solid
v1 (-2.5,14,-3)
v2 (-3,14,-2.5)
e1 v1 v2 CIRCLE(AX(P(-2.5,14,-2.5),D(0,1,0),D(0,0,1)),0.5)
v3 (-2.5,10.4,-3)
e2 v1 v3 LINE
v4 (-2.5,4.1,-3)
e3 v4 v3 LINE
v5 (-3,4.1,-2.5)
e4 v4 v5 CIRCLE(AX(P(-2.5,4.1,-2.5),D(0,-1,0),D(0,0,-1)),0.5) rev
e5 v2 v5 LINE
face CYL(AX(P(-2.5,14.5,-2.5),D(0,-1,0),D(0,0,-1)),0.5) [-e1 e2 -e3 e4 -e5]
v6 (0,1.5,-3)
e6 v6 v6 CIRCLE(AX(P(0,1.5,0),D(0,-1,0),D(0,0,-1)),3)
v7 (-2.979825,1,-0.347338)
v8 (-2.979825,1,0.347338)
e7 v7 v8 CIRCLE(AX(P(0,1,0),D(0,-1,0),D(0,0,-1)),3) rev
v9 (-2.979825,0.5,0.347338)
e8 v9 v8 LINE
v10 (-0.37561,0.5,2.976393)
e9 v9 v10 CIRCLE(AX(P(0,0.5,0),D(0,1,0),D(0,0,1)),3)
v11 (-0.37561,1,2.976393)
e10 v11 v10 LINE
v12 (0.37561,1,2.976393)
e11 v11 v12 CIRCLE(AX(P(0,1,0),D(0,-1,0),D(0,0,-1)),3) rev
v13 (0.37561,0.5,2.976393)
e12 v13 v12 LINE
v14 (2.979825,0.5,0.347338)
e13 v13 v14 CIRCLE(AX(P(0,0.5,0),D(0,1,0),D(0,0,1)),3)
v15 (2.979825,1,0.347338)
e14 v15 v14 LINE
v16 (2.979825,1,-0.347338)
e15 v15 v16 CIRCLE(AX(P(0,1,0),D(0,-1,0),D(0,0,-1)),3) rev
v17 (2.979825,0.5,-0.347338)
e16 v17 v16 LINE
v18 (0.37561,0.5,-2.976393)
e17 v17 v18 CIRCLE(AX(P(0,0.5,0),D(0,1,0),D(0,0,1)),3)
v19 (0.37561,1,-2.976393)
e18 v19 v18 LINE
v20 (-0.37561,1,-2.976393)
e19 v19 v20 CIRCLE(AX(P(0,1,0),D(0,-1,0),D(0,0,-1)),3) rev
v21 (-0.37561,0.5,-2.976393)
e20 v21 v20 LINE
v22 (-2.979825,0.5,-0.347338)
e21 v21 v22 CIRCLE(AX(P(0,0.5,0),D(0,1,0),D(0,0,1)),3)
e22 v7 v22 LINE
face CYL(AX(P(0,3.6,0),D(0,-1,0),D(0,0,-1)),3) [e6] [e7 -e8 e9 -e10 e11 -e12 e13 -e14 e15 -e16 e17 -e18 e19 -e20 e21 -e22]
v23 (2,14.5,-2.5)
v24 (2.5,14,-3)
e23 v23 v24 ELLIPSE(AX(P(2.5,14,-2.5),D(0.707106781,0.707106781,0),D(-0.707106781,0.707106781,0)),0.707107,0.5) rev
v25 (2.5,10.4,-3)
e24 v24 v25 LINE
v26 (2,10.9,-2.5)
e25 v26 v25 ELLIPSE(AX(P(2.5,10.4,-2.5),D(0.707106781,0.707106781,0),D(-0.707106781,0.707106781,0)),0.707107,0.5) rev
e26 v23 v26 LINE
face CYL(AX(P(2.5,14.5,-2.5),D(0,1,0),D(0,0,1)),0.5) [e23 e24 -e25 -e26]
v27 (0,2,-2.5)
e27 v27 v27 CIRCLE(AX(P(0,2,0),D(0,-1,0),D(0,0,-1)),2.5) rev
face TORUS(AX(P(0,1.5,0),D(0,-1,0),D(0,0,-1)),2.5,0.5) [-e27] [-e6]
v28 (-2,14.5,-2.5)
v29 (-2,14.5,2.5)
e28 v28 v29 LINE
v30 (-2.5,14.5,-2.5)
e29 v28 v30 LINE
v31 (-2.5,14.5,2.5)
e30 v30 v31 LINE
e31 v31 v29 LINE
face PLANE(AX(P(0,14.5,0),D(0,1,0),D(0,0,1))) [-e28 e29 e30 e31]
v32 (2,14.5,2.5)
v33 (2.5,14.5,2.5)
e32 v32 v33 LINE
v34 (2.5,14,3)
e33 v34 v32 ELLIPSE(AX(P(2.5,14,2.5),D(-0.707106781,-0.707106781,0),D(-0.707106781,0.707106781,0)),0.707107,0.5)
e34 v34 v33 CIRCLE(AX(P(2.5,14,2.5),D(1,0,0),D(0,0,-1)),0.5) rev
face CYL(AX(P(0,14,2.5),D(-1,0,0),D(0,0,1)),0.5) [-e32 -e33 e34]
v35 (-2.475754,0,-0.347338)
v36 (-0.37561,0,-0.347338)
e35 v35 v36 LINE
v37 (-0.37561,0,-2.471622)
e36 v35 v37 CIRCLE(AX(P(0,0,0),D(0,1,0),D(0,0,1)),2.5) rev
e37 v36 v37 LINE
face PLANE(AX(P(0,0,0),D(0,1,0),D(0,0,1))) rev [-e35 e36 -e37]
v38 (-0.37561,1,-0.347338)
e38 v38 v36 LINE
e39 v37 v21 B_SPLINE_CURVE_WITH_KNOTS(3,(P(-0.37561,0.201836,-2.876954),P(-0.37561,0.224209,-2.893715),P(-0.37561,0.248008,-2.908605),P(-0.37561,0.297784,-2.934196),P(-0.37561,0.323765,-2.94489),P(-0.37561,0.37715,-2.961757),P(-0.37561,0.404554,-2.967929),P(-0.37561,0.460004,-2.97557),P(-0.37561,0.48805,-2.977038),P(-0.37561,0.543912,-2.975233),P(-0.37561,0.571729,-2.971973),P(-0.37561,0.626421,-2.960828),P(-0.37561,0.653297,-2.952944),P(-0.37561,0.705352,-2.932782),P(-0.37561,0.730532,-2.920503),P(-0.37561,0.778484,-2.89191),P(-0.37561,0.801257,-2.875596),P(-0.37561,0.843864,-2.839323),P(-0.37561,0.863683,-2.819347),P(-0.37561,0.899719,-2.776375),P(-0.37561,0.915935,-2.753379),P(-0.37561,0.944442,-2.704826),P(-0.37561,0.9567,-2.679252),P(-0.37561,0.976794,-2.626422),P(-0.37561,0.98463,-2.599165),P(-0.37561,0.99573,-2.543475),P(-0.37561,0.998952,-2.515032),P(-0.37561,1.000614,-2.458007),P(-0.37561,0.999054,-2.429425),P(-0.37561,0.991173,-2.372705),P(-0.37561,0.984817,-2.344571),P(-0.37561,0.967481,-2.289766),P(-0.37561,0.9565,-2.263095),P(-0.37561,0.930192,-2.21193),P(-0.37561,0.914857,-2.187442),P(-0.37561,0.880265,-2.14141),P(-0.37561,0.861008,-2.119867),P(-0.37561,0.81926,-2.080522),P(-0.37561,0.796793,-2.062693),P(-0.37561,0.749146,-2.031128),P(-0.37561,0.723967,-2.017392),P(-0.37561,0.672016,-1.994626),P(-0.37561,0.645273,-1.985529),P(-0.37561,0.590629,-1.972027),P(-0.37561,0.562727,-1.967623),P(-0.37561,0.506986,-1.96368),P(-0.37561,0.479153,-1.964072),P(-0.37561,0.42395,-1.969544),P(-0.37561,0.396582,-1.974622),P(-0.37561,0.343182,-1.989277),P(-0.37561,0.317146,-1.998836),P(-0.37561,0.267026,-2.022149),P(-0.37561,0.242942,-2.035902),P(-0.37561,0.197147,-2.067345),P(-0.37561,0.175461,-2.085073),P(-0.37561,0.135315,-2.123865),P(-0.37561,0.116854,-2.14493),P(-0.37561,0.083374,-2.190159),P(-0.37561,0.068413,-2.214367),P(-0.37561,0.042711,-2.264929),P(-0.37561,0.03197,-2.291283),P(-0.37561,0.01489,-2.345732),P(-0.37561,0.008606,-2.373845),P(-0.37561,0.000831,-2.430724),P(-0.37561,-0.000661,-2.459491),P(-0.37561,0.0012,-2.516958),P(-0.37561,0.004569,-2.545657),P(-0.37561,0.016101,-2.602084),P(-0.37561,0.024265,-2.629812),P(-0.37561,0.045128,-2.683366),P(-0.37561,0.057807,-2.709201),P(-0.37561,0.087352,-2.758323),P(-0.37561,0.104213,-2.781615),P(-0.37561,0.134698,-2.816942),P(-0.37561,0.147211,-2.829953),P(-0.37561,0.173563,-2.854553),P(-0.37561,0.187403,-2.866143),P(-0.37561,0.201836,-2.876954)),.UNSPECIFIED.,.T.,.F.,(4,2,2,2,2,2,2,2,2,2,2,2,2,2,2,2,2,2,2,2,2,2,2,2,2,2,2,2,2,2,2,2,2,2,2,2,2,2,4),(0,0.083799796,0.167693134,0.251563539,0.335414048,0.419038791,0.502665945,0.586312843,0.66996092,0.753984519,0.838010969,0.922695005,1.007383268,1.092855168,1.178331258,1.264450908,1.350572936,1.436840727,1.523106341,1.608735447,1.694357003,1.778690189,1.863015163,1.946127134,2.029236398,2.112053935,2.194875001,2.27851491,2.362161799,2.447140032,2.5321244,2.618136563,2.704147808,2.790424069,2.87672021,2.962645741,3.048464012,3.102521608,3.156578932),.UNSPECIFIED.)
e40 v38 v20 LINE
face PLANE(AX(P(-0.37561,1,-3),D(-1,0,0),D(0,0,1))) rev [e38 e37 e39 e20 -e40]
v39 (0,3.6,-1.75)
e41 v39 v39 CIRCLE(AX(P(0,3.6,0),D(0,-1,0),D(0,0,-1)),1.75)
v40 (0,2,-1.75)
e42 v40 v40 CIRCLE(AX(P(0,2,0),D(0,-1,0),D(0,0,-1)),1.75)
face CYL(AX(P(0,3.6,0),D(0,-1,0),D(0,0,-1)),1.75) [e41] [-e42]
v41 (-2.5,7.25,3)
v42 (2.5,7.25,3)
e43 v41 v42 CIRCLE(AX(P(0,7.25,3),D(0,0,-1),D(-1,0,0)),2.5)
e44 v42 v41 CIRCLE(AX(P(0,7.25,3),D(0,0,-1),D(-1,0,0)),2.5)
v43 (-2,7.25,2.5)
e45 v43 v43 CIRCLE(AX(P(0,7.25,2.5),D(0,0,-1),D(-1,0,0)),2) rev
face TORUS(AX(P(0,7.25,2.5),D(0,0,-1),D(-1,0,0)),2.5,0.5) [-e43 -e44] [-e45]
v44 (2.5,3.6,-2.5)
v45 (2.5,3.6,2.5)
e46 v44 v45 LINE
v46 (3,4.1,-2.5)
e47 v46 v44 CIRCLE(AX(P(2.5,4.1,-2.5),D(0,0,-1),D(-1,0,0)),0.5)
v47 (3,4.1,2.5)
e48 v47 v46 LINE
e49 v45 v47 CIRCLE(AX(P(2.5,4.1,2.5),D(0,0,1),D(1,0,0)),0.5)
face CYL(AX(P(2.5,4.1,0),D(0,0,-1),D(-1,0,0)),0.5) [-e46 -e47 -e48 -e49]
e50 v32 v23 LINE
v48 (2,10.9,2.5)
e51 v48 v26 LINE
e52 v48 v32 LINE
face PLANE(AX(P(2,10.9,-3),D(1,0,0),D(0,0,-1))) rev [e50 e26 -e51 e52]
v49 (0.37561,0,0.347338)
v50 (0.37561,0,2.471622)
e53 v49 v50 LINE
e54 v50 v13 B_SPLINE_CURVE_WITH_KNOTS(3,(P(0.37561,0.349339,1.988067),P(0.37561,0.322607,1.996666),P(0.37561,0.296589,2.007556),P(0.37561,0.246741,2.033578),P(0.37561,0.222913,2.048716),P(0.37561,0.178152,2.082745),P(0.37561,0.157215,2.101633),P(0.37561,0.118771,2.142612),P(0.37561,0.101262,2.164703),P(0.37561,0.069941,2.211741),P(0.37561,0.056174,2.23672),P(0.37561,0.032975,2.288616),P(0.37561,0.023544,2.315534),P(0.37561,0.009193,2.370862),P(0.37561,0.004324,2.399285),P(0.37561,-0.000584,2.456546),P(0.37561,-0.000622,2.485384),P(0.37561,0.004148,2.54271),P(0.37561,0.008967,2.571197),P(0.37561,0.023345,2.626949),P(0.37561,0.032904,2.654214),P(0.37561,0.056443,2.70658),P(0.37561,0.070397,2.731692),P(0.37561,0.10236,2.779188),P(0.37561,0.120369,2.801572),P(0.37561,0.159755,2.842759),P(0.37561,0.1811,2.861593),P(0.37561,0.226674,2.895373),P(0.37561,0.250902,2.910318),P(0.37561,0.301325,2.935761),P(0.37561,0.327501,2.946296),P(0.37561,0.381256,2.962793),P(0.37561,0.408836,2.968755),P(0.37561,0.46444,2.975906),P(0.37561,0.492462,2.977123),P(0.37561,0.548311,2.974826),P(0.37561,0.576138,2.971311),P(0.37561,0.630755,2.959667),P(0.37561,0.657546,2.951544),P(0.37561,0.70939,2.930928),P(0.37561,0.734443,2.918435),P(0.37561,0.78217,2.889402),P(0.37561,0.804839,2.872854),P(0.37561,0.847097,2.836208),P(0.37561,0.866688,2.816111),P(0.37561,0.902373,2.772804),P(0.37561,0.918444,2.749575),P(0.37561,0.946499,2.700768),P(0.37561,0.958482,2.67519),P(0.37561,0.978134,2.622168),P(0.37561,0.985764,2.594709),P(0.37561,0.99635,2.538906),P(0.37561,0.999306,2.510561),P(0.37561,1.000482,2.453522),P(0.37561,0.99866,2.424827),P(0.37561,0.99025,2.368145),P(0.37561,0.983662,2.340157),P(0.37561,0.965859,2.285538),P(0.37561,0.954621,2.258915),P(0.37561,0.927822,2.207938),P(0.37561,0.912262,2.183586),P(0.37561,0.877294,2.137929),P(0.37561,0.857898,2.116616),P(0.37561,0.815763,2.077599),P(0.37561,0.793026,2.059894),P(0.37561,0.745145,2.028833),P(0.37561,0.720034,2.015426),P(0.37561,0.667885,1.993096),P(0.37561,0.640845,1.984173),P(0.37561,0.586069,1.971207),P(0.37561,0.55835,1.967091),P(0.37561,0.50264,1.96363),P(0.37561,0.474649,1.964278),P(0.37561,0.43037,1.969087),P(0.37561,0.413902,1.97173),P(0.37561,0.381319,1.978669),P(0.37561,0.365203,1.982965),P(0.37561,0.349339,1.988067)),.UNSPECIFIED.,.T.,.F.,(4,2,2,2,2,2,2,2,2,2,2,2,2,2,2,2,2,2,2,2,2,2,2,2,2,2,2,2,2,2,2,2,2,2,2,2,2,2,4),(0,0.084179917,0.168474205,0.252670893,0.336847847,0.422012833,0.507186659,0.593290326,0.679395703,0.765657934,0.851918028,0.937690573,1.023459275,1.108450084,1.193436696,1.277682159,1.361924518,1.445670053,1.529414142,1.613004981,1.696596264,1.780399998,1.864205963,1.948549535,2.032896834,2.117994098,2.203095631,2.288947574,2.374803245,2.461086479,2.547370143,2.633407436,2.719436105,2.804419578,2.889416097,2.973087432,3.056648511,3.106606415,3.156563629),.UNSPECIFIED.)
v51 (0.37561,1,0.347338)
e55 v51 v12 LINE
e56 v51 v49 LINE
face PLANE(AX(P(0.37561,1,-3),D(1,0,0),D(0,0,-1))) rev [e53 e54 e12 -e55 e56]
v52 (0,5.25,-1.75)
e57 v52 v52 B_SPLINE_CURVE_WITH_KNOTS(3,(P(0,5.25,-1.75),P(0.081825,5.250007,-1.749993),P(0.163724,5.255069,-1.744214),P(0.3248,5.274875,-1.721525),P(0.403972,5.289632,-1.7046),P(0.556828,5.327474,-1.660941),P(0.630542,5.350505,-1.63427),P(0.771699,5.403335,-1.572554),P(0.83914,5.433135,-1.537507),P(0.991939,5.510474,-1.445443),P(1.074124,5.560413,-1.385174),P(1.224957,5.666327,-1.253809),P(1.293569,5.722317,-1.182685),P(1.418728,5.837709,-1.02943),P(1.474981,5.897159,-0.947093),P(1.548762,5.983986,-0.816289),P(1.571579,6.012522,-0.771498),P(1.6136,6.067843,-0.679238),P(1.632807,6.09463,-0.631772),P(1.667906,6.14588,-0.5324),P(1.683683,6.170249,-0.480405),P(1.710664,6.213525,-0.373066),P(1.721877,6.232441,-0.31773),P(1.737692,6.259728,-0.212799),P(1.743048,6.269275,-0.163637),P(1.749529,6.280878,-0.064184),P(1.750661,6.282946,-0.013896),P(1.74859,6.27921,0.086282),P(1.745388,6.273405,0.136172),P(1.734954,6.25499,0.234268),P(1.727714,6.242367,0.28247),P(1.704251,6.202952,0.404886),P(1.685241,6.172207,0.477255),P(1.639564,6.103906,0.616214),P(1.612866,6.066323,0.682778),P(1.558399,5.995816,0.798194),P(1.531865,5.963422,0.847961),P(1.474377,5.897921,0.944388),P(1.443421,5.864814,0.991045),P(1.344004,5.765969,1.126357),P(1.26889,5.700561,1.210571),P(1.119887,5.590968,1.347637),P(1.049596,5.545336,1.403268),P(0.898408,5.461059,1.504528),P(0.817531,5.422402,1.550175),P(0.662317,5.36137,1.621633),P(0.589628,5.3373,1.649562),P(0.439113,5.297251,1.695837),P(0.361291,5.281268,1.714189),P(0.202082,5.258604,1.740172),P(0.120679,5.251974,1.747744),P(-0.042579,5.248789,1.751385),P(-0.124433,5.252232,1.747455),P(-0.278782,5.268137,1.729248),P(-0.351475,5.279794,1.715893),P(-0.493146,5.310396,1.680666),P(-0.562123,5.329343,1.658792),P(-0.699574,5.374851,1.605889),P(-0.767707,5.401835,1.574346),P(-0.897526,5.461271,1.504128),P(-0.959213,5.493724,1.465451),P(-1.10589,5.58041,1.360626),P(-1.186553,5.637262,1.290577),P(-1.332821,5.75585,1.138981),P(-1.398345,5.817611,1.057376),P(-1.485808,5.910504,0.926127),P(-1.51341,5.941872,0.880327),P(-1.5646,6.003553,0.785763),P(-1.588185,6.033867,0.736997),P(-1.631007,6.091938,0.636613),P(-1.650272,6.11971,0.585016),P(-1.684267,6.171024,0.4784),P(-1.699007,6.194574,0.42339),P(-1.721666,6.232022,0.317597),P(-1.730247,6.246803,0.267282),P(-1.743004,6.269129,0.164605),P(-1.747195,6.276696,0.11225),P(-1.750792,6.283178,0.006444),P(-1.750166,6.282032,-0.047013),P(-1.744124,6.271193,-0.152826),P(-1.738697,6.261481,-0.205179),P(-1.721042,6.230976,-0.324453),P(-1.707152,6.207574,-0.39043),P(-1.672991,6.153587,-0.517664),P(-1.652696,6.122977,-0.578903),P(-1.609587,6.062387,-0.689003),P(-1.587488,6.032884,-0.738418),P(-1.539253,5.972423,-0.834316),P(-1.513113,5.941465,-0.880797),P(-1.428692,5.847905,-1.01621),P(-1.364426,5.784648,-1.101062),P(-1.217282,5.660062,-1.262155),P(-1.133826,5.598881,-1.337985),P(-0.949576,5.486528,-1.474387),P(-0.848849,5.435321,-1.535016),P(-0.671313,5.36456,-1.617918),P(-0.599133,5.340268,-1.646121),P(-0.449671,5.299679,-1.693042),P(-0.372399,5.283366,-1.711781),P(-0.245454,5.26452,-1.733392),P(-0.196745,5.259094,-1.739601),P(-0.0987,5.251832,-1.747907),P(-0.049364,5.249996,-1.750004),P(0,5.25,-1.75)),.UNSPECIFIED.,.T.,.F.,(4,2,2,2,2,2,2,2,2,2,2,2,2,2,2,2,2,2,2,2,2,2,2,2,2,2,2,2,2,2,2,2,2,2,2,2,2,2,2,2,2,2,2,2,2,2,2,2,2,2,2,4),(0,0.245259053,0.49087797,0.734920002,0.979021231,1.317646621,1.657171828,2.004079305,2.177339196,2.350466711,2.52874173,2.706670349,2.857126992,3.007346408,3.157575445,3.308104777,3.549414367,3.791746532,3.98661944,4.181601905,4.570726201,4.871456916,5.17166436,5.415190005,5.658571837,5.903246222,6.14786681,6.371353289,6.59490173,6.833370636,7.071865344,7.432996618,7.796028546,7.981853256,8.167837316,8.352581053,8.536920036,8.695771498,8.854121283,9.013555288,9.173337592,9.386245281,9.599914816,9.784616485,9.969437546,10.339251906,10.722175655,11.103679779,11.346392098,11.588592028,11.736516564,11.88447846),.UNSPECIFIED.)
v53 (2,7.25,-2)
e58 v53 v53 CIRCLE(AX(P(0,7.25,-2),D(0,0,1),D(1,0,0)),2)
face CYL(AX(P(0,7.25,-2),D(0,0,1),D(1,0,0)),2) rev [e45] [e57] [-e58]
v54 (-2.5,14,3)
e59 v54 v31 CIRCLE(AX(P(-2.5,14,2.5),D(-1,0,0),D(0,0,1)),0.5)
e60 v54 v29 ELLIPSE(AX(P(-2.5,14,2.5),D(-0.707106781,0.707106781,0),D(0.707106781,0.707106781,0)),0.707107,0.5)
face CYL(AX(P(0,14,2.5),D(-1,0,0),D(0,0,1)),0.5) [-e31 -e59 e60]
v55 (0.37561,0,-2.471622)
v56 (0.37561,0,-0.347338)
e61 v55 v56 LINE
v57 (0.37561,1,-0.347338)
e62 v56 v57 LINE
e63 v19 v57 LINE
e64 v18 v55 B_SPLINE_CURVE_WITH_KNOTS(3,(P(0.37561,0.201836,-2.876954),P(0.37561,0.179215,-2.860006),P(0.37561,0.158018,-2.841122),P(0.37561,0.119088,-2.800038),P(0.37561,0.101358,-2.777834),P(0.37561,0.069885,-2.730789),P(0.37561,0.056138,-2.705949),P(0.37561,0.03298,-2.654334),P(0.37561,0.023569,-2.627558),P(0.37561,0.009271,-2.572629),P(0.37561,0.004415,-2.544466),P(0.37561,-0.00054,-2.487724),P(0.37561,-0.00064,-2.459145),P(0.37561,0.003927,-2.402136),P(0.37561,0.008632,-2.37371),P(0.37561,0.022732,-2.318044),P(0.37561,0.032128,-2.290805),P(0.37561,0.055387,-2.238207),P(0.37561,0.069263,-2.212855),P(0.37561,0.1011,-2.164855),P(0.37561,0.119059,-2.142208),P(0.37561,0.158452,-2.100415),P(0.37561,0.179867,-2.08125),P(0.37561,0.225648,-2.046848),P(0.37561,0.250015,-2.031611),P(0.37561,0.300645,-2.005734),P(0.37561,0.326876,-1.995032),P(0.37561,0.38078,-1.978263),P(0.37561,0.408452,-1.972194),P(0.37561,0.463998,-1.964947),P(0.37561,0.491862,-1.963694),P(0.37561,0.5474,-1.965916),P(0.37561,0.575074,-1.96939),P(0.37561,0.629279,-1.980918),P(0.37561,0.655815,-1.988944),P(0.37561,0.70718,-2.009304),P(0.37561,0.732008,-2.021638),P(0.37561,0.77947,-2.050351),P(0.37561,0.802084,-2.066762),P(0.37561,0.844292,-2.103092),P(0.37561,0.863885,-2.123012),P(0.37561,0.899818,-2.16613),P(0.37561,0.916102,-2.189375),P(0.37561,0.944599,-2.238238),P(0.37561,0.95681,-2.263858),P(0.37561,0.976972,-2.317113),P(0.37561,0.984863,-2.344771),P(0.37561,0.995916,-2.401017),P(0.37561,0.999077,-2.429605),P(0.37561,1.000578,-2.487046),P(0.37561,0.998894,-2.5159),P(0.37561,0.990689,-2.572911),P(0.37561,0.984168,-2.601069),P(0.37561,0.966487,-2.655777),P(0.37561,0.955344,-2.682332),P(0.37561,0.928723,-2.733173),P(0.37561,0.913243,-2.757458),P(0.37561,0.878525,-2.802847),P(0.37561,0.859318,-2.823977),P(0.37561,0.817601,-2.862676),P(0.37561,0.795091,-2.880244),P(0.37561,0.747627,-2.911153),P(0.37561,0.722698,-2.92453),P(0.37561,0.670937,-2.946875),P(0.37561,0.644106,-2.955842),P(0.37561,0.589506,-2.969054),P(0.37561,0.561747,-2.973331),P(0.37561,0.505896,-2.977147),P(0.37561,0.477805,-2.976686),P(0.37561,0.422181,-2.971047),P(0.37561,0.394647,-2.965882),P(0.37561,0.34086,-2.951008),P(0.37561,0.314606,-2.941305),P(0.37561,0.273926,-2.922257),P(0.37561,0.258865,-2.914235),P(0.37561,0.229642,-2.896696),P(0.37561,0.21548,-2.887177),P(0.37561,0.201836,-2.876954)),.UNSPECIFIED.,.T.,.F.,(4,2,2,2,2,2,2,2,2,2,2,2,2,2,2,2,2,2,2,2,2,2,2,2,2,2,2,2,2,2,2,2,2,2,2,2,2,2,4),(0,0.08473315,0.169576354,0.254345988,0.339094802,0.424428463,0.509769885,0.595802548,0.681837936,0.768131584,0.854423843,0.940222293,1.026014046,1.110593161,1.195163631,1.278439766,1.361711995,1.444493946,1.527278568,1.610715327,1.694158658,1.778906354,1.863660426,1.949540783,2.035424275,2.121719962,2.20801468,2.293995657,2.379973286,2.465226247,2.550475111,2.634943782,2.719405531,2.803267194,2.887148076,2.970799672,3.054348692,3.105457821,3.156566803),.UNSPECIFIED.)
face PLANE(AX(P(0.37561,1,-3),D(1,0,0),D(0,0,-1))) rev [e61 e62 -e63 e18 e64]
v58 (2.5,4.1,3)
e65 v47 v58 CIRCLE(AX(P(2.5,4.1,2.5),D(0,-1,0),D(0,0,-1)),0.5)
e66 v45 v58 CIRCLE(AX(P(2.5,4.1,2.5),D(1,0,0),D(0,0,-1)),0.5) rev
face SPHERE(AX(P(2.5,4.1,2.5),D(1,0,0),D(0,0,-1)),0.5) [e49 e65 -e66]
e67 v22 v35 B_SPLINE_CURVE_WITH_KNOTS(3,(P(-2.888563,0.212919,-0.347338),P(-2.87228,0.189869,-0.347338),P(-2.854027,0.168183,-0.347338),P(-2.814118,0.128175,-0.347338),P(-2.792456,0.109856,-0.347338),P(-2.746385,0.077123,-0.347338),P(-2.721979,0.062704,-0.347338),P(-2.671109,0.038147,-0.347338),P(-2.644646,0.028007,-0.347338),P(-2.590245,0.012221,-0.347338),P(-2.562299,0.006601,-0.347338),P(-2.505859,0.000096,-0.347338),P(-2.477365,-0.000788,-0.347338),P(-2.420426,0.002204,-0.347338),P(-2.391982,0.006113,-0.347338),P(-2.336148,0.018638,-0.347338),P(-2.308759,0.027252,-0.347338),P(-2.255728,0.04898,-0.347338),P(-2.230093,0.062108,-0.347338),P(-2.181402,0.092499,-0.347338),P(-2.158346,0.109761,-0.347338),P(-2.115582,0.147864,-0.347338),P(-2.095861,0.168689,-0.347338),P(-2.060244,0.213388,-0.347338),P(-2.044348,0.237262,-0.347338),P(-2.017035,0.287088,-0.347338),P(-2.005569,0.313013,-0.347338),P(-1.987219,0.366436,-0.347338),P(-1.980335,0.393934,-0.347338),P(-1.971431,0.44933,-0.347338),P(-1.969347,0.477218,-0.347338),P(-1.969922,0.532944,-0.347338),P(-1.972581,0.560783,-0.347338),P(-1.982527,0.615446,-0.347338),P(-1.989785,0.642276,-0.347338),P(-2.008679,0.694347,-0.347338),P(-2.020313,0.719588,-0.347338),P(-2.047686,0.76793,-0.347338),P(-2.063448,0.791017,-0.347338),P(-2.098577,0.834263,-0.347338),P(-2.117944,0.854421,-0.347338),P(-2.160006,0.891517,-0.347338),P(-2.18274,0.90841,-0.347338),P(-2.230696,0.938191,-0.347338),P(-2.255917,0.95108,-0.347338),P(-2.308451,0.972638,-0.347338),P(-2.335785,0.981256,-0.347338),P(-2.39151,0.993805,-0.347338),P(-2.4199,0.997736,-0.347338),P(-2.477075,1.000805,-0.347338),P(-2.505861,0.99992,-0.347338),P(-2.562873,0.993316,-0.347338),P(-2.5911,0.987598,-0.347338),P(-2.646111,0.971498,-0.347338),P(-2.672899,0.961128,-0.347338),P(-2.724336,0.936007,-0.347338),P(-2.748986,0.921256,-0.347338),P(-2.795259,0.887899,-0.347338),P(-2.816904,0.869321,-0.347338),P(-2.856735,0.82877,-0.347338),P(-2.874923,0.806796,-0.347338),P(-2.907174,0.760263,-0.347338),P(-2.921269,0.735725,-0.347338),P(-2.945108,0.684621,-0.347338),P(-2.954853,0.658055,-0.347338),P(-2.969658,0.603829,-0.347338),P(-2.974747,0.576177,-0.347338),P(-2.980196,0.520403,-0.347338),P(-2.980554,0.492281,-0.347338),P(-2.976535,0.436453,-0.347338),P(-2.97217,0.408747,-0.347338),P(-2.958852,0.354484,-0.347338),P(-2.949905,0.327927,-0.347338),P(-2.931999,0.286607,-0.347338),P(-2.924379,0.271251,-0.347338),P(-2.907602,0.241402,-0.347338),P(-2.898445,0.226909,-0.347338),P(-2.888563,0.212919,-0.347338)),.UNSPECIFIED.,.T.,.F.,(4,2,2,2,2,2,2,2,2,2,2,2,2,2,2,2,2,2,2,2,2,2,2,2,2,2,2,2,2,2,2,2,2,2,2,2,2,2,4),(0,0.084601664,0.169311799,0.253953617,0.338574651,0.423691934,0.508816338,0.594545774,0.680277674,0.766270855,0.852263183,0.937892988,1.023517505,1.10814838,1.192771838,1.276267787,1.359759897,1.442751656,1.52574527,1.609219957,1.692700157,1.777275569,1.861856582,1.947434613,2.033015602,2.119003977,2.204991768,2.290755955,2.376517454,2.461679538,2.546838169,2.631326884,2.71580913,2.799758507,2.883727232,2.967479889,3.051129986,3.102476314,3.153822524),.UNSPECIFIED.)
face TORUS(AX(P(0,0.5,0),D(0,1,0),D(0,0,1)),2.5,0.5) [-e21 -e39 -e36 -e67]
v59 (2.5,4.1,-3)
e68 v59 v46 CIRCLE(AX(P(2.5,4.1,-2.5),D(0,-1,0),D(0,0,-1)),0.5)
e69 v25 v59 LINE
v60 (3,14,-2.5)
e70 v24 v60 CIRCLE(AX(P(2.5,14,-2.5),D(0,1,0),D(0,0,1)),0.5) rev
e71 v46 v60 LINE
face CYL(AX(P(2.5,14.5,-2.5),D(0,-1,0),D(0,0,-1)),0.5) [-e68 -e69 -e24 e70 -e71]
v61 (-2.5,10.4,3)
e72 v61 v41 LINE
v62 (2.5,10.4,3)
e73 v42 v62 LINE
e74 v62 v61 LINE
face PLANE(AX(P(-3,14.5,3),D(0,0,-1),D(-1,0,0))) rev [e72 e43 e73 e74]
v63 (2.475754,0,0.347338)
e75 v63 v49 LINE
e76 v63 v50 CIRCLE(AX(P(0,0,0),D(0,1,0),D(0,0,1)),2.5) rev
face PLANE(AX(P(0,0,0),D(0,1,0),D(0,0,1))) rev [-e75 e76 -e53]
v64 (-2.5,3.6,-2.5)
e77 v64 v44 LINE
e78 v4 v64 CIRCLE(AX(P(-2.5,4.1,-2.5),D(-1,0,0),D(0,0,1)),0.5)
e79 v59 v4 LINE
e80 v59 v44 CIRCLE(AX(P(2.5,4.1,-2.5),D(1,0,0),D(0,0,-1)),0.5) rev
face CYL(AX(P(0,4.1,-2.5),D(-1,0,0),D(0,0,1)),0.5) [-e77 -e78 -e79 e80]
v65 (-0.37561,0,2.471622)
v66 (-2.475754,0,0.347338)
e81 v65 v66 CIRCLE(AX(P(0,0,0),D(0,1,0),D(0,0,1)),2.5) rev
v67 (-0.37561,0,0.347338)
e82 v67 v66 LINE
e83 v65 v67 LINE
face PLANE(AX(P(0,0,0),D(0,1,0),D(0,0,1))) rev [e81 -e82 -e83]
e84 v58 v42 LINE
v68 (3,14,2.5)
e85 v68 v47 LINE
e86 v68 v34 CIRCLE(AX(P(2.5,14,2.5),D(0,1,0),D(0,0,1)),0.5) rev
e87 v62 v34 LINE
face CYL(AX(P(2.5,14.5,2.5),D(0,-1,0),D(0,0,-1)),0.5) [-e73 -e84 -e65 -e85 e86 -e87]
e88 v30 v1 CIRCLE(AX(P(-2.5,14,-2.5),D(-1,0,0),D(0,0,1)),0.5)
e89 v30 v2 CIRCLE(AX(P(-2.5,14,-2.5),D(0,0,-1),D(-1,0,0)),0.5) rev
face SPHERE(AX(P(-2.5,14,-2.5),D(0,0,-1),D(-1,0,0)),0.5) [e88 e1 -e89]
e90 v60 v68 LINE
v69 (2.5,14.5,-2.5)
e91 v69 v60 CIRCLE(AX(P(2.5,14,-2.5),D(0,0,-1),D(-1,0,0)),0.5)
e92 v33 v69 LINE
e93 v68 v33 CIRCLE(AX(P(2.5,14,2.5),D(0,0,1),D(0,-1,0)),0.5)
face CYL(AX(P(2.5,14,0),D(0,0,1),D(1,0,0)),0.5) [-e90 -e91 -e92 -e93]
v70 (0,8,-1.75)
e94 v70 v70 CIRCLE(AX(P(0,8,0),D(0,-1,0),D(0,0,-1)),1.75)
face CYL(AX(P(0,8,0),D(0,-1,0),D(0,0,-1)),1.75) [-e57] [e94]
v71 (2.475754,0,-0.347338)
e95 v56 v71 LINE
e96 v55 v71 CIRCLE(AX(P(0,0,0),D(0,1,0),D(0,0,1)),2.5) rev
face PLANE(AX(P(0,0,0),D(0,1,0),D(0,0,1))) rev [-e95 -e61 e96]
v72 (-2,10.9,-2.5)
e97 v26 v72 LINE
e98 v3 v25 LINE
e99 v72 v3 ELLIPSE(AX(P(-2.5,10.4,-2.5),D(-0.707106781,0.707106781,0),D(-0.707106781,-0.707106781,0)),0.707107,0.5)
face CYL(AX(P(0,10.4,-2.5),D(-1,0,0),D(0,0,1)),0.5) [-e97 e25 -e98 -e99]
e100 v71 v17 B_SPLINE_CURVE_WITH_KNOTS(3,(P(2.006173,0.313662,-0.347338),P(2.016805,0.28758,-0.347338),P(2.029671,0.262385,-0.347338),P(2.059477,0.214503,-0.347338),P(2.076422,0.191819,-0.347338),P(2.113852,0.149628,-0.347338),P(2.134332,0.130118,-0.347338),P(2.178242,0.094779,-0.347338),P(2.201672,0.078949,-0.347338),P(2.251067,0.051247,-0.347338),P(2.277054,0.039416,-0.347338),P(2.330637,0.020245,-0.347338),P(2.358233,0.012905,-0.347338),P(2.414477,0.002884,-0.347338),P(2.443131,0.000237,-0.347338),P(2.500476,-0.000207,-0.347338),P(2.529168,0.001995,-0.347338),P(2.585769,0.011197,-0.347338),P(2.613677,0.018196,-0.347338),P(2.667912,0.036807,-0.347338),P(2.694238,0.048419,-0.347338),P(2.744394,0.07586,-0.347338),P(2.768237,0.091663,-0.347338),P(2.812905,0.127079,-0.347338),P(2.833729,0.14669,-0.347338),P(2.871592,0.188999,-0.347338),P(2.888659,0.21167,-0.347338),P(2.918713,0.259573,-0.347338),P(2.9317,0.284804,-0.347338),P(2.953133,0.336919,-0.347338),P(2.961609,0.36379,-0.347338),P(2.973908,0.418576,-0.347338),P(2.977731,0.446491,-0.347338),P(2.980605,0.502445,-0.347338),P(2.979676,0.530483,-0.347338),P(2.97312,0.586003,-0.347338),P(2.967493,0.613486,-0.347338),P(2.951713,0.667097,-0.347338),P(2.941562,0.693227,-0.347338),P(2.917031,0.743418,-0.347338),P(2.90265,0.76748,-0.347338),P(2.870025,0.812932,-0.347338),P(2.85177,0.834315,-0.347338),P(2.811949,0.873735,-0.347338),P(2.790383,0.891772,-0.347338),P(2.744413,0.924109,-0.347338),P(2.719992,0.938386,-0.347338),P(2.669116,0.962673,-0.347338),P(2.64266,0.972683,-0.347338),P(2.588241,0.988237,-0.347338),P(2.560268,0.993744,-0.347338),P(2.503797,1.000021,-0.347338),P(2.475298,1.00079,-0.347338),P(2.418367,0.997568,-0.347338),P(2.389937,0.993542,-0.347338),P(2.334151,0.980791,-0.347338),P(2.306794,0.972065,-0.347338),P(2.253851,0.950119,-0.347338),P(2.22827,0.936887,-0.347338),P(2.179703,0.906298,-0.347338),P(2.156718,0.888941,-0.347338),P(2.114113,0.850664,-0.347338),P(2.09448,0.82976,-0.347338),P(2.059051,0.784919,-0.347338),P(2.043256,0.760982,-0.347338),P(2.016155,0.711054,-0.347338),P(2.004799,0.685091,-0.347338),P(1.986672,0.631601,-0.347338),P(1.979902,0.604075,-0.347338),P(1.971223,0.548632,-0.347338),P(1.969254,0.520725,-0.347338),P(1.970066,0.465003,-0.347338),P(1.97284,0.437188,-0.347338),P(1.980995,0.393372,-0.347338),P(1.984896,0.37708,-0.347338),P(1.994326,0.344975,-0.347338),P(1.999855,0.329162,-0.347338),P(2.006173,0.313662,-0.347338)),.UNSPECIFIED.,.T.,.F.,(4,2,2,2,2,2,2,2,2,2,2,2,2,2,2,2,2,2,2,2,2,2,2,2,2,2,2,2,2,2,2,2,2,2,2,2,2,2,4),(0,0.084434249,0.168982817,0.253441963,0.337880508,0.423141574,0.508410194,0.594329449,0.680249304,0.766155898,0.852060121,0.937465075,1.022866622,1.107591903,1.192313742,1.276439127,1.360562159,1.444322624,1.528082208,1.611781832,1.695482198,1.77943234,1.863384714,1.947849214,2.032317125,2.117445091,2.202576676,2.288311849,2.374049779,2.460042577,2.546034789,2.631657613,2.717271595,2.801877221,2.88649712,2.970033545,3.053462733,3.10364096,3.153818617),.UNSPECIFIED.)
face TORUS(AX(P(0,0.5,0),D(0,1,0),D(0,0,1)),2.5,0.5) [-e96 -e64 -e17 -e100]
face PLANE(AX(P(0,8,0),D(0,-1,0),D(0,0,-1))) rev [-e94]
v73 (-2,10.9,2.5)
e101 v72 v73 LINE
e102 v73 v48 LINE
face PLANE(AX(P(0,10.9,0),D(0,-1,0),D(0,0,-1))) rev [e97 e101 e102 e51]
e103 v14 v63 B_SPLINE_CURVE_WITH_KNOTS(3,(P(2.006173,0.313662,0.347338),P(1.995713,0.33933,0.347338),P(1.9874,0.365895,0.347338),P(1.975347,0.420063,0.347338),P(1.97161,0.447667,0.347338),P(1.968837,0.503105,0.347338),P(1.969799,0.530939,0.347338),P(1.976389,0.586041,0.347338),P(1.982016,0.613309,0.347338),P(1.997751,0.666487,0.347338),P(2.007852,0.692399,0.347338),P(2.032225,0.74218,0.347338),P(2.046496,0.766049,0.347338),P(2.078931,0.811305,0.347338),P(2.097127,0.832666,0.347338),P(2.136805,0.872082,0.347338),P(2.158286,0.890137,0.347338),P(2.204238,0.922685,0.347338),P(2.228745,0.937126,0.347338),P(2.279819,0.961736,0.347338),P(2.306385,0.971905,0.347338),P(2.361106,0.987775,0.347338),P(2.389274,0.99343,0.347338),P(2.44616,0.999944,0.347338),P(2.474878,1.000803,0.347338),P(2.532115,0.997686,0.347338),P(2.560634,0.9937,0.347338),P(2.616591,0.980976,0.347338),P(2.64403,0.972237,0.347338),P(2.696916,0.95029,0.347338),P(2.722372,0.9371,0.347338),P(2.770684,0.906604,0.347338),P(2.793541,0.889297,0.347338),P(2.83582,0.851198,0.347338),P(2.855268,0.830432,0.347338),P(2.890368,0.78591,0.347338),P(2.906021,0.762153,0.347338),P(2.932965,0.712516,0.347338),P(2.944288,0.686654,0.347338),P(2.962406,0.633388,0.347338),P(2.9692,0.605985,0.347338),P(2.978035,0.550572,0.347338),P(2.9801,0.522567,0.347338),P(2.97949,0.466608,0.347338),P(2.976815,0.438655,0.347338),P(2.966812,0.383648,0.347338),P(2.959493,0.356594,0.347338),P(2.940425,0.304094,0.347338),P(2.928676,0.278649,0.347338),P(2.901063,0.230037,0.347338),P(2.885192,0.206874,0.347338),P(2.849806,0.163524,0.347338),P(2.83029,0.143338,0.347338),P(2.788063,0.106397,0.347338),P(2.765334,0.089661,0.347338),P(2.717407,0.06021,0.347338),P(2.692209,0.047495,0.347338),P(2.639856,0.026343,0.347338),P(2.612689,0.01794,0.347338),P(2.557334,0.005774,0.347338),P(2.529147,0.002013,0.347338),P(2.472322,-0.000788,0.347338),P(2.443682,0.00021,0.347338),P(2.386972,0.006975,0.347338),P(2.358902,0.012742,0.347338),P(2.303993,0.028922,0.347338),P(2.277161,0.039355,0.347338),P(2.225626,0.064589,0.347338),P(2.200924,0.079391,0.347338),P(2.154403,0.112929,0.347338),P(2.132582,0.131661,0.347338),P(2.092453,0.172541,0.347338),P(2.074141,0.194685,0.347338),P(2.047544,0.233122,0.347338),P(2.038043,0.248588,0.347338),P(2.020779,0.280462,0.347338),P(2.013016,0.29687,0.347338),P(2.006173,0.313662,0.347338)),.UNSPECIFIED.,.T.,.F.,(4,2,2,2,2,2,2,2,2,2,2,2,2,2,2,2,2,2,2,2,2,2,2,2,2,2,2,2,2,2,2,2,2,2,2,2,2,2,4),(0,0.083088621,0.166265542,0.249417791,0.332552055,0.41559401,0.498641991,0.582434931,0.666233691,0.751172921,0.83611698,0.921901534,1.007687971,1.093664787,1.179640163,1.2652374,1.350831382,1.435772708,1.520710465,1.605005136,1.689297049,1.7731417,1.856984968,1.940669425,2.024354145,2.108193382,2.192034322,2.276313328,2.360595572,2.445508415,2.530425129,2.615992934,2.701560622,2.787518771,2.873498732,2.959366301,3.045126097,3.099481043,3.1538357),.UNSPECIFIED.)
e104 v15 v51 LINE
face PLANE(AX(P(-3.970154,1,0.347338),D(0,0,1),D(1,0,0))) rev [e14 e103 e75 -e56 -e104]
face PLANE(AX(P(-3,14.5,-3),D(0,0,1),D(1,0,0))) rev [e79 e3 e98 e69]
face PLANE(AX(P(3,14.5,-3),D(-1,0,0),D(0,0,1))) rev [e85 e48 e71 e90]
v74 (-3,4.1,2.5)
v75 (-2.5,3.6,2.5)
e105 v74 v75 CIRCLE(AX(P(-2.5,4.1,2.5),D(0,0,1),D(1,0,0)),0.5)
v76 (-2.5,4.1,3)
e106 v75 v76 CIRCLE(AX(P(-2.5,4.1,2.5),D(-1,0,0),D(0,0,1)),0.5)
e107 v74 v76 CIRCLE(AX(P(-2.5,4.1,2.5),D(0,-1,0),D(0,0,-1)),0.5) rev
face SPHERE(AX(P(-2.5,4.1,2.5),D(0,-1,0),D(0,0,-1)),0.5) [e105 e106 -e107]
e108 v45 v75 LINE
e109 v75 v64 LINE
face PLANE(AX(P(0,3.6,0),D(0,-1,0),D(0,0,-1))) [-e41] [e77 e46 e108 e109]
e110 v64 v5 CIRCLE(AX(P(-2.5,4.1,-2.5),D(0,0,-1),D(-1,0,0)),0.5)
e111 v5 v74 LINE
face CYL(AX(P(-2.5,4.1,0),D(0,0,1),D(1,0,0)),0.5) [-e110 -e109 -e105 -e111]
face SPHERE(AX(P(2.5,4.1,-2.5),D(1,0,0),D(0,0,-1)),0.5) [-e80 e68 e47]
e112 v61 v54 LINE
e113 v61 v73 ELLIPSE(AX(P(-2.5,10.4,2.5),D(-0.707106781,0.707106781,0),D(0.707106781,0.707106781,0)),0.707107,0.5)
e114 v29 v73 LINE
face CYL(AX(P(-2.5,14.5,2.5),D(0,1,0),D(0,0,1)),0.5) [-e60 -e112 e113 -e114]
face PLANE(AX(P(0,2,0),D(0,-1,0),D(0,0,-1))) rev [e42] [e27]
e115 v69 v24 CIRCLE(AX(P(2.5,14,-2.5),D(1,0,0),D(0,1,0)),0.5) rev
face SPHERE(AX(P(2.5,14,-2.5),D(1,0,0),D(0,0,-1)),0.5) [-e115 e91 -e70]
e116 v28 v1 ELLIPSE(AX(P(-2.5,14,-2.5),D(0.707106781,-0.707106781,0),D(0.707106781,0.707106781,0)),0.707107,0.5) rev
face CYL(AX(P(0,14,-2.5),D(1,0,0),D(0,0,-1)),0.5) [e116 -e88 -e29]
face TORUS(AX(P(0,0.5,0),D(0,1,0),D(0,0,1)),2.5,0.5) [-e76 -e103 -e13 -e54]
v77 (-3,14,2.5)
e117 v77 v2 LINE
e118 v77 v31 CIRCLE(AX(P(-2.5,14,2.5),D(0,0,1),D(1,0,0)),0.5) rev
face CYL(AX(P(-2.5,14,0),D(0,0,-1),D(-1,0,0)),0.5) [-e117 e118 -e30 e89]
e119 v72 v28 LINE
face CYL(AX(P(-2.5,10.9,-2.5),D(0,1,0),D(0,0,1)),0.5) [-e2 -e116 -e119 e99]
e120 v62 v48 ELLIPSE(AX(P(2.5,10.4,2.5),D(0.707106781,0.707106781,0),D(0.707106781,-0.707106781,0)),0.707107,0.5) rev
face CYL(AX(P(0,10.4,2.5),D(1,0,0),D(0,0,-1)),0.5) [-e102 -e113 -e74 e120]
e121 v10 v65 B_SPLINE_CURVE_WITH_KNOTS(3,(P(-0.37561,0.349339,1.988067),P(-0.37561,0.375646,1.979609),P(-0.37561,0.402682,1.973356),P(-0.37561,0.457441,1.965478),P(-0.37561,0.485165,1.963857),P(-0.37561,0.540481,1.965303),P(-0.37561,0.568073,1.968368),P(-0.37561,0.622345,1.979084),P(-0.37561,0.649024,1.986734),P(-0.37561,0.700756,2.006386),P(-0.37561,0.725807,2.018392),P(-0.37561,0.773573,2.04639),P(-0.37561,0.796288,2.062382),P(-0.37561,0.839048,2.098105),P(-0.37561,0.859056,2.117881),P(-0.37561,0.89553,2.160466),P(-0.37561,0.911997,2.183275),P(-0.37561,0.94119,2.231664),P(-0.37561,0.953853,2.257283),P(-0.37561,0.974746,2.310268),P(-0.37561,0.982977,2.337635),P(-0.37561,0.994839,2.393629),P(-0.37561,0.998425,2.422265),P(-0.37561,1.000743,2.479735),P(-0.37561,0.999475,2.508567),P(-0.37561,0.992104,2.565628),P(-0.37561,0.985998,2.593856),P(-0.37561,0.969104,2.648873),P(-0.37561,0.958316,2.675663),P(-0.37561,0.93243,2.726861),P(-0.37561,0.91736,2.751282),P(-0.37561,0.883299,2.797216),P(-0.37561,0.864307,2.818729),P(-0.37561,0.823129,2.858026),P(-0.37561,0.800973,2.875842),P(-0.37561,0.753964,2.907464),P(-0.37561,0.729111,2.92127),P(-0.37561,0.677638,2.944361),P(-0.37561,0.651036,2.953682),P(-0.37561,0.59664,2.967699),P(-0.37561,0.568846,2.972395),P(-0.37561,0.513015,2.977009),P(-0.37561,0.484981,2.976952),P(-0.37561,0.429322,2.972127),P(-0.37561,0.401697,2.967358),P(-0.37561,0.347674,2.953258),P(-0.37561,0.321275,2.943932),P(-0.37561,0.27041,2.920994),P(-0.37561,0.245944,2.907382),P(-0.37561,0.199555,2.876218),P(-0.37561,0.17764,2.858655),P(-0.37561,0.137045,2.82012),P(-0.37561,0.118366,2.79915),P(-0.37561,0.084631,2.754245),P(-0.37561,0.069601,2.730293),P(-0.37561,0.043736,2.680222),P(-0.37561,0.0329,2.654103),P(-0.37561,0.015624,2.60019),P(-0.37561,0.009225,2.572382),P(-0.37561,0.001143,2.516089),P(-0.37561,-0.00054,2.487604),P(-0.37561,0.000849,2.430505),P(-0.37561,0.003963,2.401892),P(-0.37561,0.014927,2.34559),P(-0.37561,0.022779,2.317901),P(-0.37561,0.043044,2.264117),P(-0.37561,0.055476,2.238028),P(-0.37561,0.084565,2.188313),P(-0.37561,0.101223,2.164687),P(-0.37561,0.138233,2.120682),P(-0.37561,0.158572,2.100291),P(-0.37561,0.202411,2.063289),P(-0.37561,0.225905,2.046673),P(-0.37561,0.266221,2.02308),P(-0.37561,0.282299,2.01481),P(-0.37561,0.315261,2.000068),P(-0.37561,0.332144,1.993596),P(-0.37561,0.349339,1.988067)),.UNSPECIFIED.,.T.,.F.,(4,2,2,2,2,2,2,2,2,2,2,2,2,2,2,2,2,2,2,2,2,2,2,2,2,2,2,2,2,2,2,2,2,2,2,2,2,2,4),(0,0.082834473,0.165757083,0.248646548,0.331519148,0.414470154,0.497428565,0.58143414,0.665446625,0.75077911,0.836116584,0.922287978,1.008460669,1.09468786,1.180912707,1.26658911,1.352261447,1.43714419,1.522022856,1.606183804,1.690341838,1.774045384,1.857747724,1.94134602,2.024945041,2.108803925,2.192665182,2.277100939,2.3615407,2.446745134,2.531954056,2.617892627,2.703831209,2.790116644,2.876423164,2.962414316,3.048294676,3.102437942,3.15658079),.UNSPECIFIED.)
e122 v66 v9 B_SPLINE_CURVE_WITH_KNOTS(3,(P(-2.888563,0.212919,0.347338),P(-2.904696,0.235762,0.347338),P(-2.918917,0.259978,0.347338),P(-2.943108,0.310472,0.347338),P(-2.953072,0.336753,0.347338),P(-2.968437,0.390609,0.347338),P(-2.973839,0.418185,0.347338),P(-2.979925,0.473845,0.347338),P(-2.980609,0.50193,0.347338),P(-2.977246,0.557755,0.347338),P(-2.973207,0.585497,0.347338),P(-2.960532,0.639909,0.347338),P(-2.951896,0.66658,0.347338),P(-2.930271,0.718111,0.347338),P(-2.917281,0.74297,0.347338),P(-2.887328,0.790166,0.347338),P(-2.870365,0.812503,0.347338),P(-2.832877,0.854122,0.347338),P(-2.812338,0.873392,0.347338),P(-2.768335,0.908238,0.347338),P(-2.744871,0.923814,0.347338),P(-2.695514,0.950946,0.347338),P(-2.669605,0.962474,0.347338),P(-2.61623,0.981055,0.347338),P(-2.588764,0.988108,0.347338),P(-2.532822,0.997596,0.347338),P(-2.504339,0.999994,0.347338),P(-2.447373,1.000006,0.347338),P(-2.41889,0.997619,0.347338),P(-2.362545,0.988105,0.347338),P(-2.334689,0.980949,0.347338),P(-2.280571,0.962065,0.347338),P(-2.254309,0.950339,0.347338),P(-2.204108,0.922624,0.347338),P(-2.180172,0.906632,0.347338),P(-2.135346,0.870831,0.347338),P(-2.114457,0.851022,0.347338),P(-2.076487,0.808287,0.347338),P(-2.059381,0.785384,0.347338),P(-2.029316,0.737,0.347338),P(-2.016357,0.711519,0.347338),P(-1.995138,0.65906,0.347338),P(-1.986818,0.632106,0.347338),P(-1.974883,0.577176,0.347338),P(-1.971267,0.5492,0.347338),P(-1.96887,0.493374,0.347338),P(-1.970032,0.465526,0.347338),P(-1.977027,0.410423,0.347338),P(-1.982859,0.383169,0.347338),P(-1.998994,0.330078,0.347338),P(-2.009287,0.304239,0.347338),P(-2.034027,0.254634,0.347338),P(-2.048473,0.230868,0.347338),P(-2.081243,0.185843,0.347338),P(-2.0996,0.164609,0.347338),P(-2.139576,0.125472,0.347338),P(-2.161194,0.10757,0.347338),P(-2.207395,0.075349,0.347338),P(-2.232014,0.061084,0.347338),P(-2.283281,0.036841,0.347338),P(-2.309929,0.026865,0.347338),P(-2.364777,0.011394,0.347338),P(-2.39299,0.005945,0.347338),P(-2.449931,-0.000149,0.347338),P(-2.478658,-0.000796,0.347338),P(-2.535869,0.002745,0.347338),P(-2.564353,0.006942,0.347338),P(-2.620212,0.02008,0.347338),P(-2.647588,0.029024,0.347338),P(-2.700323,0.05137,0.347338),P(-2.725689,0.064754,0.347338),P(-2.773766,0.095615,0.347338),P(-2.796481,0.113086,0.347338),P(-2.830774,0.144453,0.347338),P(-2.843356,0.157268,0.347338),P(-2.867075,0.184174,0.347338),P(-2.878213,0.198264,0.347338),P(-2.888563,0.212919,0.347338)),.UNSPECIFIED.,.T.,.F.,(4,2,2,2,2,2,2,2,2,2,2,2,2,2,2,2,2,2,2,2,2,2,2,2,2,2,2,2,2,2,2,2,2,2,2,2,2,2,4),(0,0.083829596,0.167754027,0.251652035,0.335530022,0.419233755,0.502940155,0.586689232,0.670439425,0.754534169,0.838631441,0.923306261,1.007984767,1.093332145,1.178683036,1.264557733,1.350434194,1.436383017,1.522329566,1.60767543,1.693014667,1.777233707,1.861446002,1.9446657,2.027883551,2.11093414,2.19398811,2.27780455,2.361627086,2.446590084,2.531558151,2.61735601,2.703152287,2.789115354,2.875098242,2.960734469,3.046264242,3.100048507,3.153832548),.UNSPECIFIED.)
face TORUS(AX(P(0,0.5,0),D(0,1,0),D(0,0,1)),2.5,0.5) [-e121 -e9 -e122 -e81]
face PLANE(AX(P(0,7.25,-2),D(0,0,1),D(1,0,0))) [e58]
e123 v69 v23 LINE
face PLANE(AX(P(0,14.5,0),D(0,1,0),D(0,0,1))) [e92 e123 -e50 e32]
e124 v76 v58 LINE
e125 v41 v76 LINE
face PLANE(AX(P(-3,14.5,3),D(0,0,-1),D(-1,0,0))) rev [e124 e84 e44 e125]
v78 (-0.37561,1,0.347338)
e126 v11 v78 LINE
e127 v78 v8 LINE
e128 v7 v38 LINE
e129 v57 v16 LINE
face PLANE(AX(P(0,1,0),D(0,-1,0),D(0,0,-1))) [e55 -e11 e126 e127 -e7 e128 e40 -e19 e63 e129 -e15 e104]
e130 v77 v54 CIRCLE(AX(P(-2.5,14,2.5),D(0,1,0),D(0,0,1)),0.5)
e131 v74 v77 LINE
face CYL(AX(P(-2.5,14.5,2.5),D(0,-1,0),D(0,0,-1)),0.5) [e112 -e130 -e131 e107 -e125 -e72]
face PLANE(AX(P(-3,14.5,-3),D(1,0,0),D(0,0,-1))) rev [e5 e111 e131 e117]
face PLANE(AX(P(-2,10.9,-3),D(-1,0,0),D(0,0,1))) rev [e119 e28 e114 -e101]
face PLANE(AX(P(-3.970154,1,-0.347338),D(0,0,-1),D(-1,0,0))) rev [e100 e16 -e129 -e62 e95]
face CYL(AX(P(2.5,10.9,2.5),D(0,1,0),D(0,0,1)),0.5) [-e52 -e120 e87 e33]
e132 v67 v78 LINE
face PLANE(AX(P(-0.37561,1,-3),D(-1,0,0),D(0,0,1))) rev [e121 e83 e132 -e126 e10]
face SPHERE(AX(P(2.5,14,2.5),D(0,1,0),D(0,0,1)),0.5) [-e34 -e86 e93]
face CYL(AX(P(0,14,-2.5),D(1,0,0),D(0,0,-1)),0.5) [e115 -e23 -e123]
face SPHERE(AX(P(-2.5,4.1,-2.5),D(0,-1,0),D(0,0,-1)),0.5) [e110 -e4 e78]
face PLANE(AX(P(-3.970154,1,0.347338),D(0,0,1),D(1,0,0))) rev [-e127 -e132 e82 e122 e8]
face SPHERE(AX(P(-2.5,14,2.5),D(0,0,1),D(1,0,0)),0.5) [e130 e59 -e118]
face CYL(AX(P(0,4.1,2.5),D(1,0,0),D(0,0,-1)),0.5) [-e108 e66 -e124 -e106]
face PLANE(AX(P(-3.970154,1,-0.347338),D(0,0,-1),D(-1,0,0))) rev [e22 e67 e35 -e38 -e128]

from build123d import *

# Parameters (mm, degrees)
BOSS_EXTRUDE1_DEPTH = 14.5
CUT_EXTRUDE1_DEPTH  = 3.6
CUT_EXTRUDE2_DEPTH  = 3.6
CUT_EXTRUDE3_START  = -2
SKETCH4_R           = 3.0000000000000004
SKETCH4_R_2         = 1.75
CUT_EXTRUDE3_DEPTH  = 1.6
SKETCH5_R           = 2
CUT_EXTRUDE4_DEPTH  = 5
FILLET1_R           = 0.5
FILLET3_R           = 0.5
SKETCH6_W           = 0.7512194361763478
SKETCH6_H           = 6
CUT_EXTRUDE5_DEPTH  = 1
SKETCH7_W           = 7.9403086641005265
SKETCH7_H           = 0.6946760377543701
CUT_EXTRUDE6_DEPTH  = 1
SKETCH8_R           = 1.75
BOSS_EXTRUDE2_DEPTH = 7


with BuildPart() as part:
    # Sketch1 → Boss-Extrude1 (new body)
    with BuildSketch(Plane(origin=(0, 0, 0), x_dir=(1, 0, 0), z_dir=(0, 1, 0))):
        Polygon((-3.0000000000000004, 3), (2.9999999999999996, 3), (3.0000000000000004, -3), (-2.9999999999999996, -3), align=None)
    extrude(amount=BOSS_EXTRUDE1_DEPTH)

    # Sketch2 → Cut-Extrude1 (cut)
    with BuildSketch(Plane(origin=(0, 14.5, 0), x_dir=(1, 0, 0), z_dir=(0, 1, 0))):
        Polygon((2, 3), (-2, 3), (-2, -3), (2, -2.9999999999999982), align=None)
    extrude(amount=-CUT_EXTRUDE1_DEPTH, mode=Mode.SUBTRACT)

    # Sketch3 → Cut-Extrude2 (cut)
    with BuildSketch(Plane.XZ):
        with BuildLine():
            ThreePointArc((-4.6684e-13, -3), (-2.121320343559808, -2.1213203435594776), (-3, 3.7e-16))
            Line((-2.9999999999999996, -2.22e-15), (-2.9999999999999996, -3))
            Line((-2.9999999999999996, -3), (-4.6674e-13, -3))
        make_face()
        with BuildLine():
            Line((2.9999999999999996, -3), (2.9999999999999996, 0))
            ThreePointArc((3, -7.3e-16), (2.121320343559478, -2.121320343559807), (-4.6684e-13, -3))
            Line((-4.6674e-13, -3), (2.9999999999999996, -3))
        make_face()
        with BuildLine():
            Line((2.9999999999999996, 3), (-4.6763e-13, 3))
            ThreePointArc((-4.6678e-13, 3), (2.1213203435594776, 2.1213203435598076), (3, 0))
            Line((2.9999999999999996, 0), (2.9999999999999996, 3))
        make_face()
        with BuildLine():
            Line((-4.6763e-13, 3), (-2.9999999999999996, 3))
            Line((-2.9999999999999996, 3), (-2.9999999999999996, -2.22e-15))
            ThreePointArc((-3, 3.7e-16), (-2.121320343559808, 2.1213203435594767), (-4.6744e-13, 3))
        make_face()
    extrude(amount=-CUT_EXTRUDE2_DEPTH, mode=Mode.SUBTRACT)

    # Sketch4 → Cut-Extrude3 (cut)
    with BuildSketch(Plane.XZ.offset(CUT_EXTRUDE3_START)):
        with Locations(Location((0, 0, 0), (0, 0, 270))):
            Circle(SKETCH4_R)
        with Locations(Location((0, 0, 0), (0, 0, 270))):
            Circle(SKETCH4_R_2, mode=Mode.SUBTRACT)
    extrude(amount=-CUT_EXTRUDE3_DEPTH, mode=Mode.SUBTRACT)

    # Sketch5 → Cut-Extrude4 (cut)
    with BuildSketch(Plane.XY.offset(3)):
        with Locations((0, 7.249999999999999)):
            Circle(SKETCH5_R)
    extrude(amount=-CUT_EXTRUDE4_DEPTH, mode=Mode.SUBTRACT)

    # Fillet1
    fillet1_edges = [part.edges().sort_by_distance(p)[0] for p in [
        (-3, 0, 5.9e-16),
        (-3.0000000000000004, 2, 3.82e-15),
    ]]
    fillet(fillet1_edges, radius=FILLET1_R)

    # Fillet3
    fillet3_edges = [part.edges().sort_by_distance(p)[0] for p in [
        (-3, 14.5, 0),
        (-2.5, 14.5, -3),
        (2.5, 14.5, 3),
        (-2.4999999999999996, 14.5, 3),
        (-2, 12.7, 3),
        (0, 10.9, -3),
        (-2, 12.7, -3),
        (2, 12.7, -3),
        (0, 10.9, 2.999999999999999),
        (2, 12.7, 2.9999999999999982),
        (0, 3.6, 3),
        (2.9999999999999996, 3.6, 0),
        (3, 14.5, 0),
        (0, 3.6, -3),
        (-2.9999999999999996, 3.6, 0),
        (3.0000000000000004, 9.05, 3),
        (-2.9999999999999996, 9.05, 3),
        (-3.0000000000000004, 9.05, -3),
        (2.9999999999999996, 9.05, -3),
        (2.4999999999999996, 14.5, -3),
        (-2, 7.249999999999999, 3),
    ]]
    fillet(fillet3_edges, radius=FILLET3_R - 0.0001)  # a hair under: the kernel refuses the full size

    # Sketch6 → Cut-Extrude5 (cut)
    with BuildSketch(Plane.XZ):
        Rectangle(SKETCH6_W, SKETCH6_H)
    extrude(amount=-CUT_EXTRUDE5_DEPTH, mode=Mode.SUBTRACT)

    # Sketch7 → Cut-Extrude6 (cut)
    with BuildSketch(Plane.XZ):
        Rectangle(SKETCH7_W, SKETCH7_H)
    extrude(amount=-CUT_EXTRUDE6_DEPTH, mode=Mode.SUBTRACT)

    # Sketch8 → Boss-Extrude2 (add)
    with BuildSketch(Plane.XZ.offset(-1)):
        with Locations(Location((0, 0, 0), (0, 0, 270))):
            Circle(SKETCH8_R)
    extrude(amount=-BOSS_EXTRUDE2_DEPTH)


solid = part.part
